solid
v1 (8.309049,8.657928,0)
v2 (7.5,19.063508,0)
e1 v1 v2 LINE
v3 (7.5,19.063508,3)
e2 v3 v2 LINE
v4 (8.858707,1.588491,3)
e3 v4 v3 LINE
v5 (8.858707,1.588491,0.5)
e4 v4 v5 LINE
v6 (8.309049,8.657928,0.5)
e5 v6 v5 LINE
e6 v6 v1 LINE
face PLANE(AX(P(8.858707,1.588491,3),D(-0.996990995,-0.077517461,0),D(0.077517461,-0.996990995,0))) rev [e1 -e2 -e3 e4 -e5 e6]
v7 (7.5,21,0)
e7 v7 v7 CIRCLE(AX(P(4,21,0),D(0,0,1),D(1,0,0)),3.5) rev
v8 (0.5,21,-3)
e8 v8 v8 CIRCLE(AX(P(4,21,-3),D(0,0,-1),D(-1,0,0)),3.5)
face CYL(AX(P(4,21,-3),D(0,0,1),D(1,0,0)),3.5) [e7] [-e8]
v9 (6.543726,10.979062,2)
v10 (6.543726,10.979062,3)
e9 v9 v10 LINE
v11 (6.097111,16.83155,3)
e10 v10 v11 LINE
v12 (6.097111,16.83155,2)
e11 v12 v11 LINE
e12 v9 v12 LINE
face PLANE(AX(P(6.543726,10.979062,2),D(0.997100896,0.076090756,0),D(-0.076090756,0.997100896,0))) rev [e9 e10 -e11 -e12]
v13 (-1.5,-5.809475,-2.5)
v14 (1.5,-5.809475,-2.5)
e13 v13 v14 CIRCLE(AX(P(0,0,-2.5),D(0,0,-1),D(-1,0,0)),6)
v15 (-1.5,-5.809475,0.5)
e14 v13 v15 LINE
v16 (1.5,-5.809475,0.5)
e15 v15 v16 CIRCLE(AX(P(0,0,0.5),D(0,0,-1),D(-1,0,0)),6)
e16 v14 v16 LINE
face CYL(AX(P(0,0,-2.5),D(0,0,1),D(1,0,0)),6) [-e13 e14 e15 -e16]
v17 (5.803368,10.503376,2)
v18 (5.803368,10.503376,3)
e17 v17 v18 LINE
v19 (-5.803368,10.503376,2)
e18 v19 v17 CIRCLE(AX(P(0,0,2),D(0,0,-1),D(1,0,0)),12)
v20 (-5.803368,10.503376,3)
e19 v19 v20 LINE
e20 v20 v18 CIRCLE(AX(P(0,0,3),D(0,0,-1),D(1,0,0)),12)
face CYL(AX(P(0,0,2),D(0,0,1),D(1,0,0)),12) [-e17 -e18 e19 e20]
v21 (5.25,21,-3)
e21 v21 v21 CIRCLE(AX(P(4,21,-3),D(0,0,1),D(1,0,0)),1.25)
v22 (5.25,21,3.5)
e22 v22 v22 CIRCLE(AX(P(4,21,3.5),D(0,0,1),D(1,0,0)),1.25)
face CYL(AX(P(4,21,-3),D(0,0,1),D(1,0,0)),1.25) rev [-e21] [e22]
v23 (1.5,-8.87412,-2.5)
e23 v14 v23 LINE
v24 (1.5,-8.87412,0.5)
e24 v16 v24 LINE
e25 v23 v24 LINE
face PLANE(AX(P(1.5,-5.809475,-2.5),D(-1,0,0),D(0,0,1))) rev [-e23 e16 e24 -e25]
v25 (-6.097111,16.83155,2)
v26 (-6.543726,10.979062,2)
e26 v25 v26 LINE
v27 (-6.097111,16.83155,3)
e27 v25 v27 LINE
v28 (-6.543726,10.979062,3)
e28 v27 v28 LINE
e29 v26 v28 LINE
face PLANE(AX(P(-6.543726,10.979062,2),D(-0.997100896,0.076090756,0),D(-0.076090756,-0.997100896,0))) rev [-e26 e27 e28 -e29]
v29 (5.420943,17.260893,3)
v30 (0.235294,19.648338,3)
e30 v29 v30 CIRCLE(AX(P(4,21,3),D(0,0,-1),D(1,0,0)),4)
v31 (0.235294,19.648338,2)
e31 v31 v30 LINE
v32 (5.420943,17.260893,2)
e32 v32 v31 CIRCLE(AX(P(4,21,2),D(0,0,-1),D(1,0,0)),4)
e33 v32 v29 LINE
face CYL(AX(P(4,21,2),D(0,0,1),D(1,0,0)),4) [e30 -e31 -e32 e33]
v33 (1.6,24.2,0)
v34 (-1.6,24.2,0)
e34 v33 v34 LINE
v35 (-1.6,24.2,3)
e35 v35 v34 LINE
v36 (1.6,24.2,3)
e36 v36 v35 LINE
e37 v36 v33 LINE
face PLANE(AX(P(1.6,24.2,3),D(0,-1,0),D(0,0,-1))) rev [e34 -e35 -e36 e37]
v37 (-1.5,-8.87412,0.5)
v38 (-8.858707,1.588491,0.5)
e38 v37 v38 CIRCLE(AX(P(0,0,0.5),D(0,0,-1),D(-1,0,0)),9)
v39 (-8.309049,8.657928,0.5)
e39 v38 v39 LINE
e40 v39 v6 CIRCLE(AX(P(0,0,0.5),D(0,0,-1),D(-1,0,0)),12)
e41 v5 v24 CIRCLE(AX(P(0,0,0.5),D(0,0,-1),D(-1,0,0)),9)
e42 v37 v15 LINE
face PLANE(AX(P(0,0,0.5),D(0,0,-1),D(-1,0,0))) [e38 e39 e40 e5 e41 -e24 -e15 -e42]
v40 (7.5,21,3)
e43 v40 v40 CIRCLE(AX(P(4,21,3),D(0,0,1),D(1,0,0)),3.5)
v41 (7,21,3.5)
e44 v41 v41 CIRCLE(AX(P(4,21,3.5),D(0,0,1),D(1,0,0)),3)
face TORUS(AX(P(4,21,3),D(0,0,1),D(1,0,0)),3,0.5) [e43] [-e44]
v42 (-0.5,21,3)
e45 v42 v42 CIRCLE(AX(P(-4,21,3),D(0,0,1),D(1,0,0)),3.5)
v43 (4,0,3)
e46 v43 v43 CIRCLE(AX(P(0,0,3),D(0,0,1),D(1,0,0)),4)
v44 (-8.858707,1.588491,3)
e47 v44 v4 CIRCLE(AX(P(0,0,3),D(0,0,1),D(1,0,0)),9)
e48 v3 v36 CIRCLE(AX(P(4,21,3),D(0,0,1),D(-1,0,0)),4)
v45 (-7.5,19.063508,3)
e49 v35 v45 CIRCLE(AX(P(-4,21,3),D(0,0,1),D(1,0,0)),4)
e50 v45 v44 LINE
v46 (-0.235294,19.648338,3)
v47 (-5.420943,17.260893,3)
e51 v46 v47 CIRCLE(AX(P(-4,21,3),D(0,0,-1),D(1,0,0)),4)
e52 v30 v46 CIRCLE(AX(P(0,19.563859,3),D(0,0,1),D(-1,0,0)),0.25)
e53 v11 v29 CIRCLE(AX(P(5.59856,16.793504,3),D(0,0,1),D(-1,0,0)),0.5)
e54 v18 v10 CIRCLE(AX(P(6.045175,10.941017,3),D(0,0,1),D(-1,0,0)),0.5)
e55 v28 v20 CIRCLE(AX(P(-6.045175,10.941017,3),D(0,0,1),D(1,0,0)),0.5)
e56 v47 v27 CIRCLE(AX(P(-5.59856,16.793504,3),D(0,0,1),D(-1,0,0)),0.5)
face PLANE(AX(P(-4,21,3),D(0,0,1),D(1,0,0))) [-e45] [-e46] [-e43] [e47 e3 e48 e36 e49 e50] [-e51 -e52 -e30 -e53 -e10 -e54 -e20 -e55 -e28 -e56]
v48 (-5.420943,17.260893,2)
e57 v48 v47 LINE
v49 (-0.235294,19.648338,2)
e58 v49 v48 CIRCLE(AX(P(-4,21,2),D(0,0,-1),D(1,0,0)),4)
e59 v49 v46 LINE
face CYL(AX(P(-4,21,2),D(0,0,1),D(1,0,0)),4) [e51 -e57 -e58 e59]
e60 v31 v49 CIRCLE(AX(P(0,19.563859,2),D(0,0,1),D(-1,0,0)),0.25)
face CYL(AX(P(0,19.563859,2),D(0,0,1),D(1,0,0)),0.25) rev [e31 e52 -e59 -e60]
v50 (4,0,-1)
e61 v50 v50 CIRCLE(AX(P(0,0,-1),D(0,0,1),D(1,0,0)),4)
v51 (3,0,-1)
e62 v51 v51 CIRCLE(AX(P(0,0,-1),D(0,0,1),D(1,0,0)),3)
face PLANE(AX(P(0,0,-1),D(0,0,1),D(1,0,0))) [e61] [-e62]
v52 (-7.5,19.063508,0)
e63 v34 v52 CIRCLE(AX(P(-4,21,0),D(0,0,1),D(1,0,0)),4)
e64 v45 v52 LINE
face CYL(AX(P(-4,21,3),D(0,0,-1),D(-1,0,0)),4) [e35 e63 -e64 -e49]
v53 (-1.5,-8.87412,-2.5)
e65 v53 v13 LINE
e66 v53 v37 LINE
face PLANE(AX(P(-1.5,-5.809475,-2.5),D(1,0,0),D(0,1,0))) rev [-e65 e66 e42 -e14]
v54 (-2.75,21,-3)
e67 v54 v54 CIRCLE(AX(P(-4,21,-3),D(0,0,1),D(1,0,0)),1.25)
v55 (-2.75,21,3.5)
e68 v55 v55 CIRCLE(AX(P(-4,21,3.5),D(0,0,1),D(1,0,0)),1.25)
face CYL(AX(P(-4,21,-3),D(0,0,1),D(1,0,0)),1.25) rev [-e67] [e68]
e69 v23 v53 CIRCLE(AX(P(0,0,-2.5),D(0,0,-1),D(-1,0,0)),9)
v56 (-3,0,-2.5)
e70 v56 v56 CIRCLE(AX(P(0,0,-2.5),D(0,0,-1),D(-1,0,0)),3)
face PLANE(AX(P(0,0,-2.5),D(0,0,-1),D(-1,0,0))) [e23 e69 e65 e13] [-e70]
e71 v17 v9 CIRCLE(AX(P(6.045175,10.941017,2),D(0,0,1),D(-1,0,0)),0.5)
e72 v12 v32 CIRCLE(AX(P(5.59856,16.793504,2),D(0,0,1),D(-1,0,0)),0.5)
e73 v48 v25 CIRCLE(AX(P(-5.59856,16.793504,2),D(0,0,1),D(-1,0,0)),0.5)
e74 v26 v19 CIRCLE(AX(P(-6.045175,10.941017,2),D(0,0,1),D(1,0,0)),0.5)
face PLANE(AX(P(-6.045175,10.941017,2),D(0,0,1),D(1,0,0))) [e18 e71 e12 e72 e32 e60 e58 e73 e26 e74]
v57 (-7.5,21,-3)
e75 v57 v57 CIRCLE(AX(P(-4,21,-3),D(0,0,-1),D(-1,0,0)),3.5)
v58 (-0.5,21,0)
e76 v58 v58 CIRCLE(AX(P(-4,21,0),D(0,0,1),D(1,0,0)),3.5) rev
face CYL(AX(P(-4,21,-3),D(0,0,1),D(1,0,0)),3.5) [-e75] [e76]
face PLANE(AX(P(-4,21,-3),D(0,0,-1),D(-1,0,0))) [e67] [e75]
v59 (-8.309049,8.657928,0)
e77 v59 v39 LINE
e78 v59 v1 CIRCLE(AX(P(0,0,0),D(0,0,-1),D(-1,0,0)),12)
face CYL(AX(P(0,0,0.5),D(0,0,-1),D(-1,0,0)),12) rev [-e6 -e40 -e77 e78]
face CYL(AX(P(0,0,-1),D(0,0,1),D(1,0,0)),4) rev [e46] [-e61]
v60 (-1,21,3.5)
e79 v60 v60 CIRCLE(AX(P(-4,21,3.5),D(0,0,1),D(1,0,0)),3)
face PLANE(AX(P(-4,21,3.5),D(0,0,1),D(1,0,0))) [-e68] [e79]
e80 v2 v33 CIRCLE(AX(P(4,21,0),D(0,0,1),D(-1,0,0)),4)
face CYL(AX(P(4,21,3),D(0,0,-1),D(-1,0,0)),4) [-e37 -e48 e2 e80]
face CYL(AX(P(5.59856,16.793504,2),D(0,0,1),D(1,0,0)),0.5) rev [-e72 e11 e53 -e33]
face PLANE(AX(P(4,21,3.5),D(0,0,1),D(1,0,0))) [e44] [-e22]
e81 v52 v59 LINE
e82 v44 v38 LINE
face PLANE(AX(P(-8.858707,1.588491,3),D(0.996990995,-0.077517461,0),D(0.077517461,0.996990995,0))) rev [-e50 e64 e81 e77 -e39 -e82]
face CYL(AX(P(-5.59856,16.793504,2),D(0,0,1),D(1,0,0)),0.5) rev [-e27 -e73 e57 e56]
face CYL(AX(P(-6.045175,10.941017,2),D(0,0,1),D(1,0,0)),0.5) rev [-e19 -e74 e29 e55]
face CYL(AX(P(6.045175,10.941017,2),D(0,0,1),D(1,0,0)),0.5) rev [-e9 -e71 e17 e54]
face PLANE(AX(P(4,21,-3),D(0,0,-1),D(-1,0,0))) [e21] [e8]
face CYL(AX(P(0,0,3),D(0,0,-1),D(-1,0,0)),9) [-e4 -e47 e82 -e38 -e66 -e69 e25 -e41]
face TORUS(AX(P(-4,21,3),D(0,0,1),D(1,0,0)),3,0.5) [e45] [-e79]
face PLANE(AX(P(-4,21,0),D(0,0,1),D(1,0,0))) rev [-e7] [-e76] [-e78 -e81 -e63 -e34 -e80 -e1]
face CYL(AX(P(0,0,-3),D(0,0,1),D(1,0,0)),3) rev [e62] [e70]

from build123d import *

# Parameters (mm, degrees)
BASE_EXTRUSION_DEPTH    = 3
ESQUISSE2_R             = 3.5
BOSS_EXTRU_1_DEPTH      = 0.5
CONG_1_R                = 0.5
ENL_V_START             = -1
ENL_V_MAT_EXTRU_1_DEPTH = 1
BOSS_EXTRU_2_START      = 3
ESQUISSE5_R             = 3.5
BOSS_EXTRU_2_DEPTH      = 3
ESQUISSE4_R             = 1.25
ENL_V_MAT_EXTRU_3_DEPTH = 28.354158733
ESQUISSE9_R             = 12
ENL_V_MAT_EXTRU_4_DEPTH = 0.5
BOSS_EXTRU_3_START      = 3
BOSS_EXTRU_3_DEPTH      = 3
ESQUISSE12_R            = 4
ENL_V_MAT_EXTRU_5_DEPTH = 4
ESQUISSE13_R            = 3
ENL_V_MAT_EXTRU_6_DEPTH = 27.949025956


with BuildPart() as part:
    # Esquisse1 → Base-Extrusion (new body)
    with BuildSketch(Plane.XY):
        with BuildLine():
            Line((-8.858707286, 1.588491495), (-7.5, 19.063508327))
            ThreePointArc((-7.5, 19.063508327), (-6.626477999, 24.01688802), (-1.6, 24.2))
            Line((-1.6, 24.2), (1.6, 24.2))
            ThreePointArc((1.6, 24.2), (6.626477999, 24.01688802), (7.5, 19.063508327))
            Line((7.5, 19.063508327), (8.858707286, 1.588491495))
            ThreePointArc((8.858707286, 1.588491495), (0, -9), (-8.858707286, 1.588491495))
        make_face()
    extrude(amount=BASE_EXTRUSION_DEPTH)

    # Esquisse2 → Boss.-Extru.1 (add)
    with BuildSketch(Plane.XY.offset(3)):
        with Locations((4, 21)):
            Circle(ESQUISSE2_R)
        with Locations((-4, 21)):
            Circle(ESQUISSE2_R)
    extrude(amount=BOSS_EXTRU_1_DEPTH)

    # Congé1
    cong_1_edges = [part.edges().sort_by_distance(p)[0] for p in [
        (0.5, 21, 3.5),
        (-7.5, 21, 3.5),
    ]]
    fillet(cong_1_edges, radius=CONG_1_R - 0.0001)  # a hair under: the kernel refuses the full size

    # Esquisse3 → Enlèv. mat.-Extru.1 (cut)
    with BuildSketch(Plane.XY.offset(3).offset(ENL_V_START)):
        with BuildLine():
            Line((-6.543725832, 10.97906245), (-6.097110858, 16.831549851))
            ThreePointArc((-6.097110858, 16.831549851), (-5.866577748, 17.215602456), (-5.420942587, 17.260892865))
            ThreePointArc((-5.420942587, 17.260892865), (-2.327193854, 17.366582931), (-0.235294118, 19.648338201))
            ThreePointArc((-0.235294118, 19.648338201), (0, 19.813859338), (0.235294118, 19.648338201))
            ThreePointArc((0.235294118, 19.648338201), (2.327193854, 17.366582931), (5.420942587, 17.260892865))
            ThreePointArc((5.420942587, 17.260892865), (5.866577748, 17.215602456), (6.097110858, 16.831549851))
            Line((6.097110858, 16.831549851), (6.543725832, 10.97906245))
            ThreePointArc((6.543725832, 10.97906245), (6.315450438, 10.520361161), (5.803368369, 10.503376389))
            ThreePointArc((5.803368369, 10.503376389), (0, 12), (-5.803368369, 10.503376389))
            ThreePointArc((-5.803368369, 10.503376389), (-6.315450438, 10.520361161), (-6.543725832, 10.97906245))
        make_face()
    extrude(amount=ENL_V_MAT_EXTRU_1_DEPTH, mode=Mode.SUBTRACT)

    # Esquisse5 → Boss.-Extru.2 (add)
    with BuildSketch(Plane(origin=(0, 0, 0), x_dir=(-1, 0, 0), z_dir=(0, 0, -1)).offset(BOSS_EXTRU_2_START)):
        with Locations(Location((4, 21, 0), (0, 0, 180))):
            Circle(ESQUISSE5_R)
        with Locations(Location((-4, 21, 0), (0, 0, 180))):
            Circle(ESQUISSE5_R)
    extrude(amount=-BOSS_EXTRU_2_DEPTH)

    # Esquisse4 → Enlèv. mat.-Extru.3 (cut, through all)
    with BuildSketch(Plane.XY.offset(3.5)):
        with Locations((4, 21)):
            Circle(ESQUISSE4_R)
        with Locations((-4, 21)):
            Circle(ESQUISSE4_R)
    extrude(amount=-ENL_V_MAT_EXTRU_3_DEPTH, mode=Mode.SUBTRACT)

    # Esquisse9 → Enlèv. mat.-Extru.4 (cut)
    with BuildSketch(Plane(origin=(0, 0, 0), x_dir=(-1, 0, 0), z_dir=(0, 0, -1))):
        Circle(ESQUISSE9_R)
    extrude(amount=-ENL_V_MAT_EXTRU_4_DEPTH, mode=Mode.SUBTRACT)

    # Esquisse11 → Boss.-Extru.3 (add)
    with BuildSketch(Plane(origin=(0, 0, 0.5), x_dir=(-1, 0, 0), z_dir=(0, 0, -1)).offset(BOSS_EXTRU_3_START)):
        with BuildLine():
            Line((1.5, -5.809475019), (1.5, -8.874119675))
            ThreePointArc((1.5, -8.874119675), (0, -9), (-1.5, -8.874119675))
            Line((-1.5, -8.874119675), (-1.5, -5.809475019))
            ThreePointArc((-1.5, -5.809475019), (0, 6), (1.5, -5.809475019))
        make_face()
    extrude(amount=-BOSS_EXTRU_3_DEPTH)

    # Esquisse12 → Enlèv. mat.-Extru.5 (cut)
    with BuildSketch(Plane.XY.offset(3)):
        Circle(ESQUISSE12_R)
    extrude(amount=-ENL_V_MAT_EXTRU_5_DEPTH, mode=Mode.SUBTRACT)

    # Esquisse13 → Enlèv. mat.-Extru.6 (cut, through all)
    with BuildSketch(Plane.XY.offset(-1)):
        Circle(ESQUISSE13_R)
    extrude(amount=-ENL_V_MAT_EXTRU_6_DEPTH, mode=Mode.SUBTRACT)


solid = part.part
